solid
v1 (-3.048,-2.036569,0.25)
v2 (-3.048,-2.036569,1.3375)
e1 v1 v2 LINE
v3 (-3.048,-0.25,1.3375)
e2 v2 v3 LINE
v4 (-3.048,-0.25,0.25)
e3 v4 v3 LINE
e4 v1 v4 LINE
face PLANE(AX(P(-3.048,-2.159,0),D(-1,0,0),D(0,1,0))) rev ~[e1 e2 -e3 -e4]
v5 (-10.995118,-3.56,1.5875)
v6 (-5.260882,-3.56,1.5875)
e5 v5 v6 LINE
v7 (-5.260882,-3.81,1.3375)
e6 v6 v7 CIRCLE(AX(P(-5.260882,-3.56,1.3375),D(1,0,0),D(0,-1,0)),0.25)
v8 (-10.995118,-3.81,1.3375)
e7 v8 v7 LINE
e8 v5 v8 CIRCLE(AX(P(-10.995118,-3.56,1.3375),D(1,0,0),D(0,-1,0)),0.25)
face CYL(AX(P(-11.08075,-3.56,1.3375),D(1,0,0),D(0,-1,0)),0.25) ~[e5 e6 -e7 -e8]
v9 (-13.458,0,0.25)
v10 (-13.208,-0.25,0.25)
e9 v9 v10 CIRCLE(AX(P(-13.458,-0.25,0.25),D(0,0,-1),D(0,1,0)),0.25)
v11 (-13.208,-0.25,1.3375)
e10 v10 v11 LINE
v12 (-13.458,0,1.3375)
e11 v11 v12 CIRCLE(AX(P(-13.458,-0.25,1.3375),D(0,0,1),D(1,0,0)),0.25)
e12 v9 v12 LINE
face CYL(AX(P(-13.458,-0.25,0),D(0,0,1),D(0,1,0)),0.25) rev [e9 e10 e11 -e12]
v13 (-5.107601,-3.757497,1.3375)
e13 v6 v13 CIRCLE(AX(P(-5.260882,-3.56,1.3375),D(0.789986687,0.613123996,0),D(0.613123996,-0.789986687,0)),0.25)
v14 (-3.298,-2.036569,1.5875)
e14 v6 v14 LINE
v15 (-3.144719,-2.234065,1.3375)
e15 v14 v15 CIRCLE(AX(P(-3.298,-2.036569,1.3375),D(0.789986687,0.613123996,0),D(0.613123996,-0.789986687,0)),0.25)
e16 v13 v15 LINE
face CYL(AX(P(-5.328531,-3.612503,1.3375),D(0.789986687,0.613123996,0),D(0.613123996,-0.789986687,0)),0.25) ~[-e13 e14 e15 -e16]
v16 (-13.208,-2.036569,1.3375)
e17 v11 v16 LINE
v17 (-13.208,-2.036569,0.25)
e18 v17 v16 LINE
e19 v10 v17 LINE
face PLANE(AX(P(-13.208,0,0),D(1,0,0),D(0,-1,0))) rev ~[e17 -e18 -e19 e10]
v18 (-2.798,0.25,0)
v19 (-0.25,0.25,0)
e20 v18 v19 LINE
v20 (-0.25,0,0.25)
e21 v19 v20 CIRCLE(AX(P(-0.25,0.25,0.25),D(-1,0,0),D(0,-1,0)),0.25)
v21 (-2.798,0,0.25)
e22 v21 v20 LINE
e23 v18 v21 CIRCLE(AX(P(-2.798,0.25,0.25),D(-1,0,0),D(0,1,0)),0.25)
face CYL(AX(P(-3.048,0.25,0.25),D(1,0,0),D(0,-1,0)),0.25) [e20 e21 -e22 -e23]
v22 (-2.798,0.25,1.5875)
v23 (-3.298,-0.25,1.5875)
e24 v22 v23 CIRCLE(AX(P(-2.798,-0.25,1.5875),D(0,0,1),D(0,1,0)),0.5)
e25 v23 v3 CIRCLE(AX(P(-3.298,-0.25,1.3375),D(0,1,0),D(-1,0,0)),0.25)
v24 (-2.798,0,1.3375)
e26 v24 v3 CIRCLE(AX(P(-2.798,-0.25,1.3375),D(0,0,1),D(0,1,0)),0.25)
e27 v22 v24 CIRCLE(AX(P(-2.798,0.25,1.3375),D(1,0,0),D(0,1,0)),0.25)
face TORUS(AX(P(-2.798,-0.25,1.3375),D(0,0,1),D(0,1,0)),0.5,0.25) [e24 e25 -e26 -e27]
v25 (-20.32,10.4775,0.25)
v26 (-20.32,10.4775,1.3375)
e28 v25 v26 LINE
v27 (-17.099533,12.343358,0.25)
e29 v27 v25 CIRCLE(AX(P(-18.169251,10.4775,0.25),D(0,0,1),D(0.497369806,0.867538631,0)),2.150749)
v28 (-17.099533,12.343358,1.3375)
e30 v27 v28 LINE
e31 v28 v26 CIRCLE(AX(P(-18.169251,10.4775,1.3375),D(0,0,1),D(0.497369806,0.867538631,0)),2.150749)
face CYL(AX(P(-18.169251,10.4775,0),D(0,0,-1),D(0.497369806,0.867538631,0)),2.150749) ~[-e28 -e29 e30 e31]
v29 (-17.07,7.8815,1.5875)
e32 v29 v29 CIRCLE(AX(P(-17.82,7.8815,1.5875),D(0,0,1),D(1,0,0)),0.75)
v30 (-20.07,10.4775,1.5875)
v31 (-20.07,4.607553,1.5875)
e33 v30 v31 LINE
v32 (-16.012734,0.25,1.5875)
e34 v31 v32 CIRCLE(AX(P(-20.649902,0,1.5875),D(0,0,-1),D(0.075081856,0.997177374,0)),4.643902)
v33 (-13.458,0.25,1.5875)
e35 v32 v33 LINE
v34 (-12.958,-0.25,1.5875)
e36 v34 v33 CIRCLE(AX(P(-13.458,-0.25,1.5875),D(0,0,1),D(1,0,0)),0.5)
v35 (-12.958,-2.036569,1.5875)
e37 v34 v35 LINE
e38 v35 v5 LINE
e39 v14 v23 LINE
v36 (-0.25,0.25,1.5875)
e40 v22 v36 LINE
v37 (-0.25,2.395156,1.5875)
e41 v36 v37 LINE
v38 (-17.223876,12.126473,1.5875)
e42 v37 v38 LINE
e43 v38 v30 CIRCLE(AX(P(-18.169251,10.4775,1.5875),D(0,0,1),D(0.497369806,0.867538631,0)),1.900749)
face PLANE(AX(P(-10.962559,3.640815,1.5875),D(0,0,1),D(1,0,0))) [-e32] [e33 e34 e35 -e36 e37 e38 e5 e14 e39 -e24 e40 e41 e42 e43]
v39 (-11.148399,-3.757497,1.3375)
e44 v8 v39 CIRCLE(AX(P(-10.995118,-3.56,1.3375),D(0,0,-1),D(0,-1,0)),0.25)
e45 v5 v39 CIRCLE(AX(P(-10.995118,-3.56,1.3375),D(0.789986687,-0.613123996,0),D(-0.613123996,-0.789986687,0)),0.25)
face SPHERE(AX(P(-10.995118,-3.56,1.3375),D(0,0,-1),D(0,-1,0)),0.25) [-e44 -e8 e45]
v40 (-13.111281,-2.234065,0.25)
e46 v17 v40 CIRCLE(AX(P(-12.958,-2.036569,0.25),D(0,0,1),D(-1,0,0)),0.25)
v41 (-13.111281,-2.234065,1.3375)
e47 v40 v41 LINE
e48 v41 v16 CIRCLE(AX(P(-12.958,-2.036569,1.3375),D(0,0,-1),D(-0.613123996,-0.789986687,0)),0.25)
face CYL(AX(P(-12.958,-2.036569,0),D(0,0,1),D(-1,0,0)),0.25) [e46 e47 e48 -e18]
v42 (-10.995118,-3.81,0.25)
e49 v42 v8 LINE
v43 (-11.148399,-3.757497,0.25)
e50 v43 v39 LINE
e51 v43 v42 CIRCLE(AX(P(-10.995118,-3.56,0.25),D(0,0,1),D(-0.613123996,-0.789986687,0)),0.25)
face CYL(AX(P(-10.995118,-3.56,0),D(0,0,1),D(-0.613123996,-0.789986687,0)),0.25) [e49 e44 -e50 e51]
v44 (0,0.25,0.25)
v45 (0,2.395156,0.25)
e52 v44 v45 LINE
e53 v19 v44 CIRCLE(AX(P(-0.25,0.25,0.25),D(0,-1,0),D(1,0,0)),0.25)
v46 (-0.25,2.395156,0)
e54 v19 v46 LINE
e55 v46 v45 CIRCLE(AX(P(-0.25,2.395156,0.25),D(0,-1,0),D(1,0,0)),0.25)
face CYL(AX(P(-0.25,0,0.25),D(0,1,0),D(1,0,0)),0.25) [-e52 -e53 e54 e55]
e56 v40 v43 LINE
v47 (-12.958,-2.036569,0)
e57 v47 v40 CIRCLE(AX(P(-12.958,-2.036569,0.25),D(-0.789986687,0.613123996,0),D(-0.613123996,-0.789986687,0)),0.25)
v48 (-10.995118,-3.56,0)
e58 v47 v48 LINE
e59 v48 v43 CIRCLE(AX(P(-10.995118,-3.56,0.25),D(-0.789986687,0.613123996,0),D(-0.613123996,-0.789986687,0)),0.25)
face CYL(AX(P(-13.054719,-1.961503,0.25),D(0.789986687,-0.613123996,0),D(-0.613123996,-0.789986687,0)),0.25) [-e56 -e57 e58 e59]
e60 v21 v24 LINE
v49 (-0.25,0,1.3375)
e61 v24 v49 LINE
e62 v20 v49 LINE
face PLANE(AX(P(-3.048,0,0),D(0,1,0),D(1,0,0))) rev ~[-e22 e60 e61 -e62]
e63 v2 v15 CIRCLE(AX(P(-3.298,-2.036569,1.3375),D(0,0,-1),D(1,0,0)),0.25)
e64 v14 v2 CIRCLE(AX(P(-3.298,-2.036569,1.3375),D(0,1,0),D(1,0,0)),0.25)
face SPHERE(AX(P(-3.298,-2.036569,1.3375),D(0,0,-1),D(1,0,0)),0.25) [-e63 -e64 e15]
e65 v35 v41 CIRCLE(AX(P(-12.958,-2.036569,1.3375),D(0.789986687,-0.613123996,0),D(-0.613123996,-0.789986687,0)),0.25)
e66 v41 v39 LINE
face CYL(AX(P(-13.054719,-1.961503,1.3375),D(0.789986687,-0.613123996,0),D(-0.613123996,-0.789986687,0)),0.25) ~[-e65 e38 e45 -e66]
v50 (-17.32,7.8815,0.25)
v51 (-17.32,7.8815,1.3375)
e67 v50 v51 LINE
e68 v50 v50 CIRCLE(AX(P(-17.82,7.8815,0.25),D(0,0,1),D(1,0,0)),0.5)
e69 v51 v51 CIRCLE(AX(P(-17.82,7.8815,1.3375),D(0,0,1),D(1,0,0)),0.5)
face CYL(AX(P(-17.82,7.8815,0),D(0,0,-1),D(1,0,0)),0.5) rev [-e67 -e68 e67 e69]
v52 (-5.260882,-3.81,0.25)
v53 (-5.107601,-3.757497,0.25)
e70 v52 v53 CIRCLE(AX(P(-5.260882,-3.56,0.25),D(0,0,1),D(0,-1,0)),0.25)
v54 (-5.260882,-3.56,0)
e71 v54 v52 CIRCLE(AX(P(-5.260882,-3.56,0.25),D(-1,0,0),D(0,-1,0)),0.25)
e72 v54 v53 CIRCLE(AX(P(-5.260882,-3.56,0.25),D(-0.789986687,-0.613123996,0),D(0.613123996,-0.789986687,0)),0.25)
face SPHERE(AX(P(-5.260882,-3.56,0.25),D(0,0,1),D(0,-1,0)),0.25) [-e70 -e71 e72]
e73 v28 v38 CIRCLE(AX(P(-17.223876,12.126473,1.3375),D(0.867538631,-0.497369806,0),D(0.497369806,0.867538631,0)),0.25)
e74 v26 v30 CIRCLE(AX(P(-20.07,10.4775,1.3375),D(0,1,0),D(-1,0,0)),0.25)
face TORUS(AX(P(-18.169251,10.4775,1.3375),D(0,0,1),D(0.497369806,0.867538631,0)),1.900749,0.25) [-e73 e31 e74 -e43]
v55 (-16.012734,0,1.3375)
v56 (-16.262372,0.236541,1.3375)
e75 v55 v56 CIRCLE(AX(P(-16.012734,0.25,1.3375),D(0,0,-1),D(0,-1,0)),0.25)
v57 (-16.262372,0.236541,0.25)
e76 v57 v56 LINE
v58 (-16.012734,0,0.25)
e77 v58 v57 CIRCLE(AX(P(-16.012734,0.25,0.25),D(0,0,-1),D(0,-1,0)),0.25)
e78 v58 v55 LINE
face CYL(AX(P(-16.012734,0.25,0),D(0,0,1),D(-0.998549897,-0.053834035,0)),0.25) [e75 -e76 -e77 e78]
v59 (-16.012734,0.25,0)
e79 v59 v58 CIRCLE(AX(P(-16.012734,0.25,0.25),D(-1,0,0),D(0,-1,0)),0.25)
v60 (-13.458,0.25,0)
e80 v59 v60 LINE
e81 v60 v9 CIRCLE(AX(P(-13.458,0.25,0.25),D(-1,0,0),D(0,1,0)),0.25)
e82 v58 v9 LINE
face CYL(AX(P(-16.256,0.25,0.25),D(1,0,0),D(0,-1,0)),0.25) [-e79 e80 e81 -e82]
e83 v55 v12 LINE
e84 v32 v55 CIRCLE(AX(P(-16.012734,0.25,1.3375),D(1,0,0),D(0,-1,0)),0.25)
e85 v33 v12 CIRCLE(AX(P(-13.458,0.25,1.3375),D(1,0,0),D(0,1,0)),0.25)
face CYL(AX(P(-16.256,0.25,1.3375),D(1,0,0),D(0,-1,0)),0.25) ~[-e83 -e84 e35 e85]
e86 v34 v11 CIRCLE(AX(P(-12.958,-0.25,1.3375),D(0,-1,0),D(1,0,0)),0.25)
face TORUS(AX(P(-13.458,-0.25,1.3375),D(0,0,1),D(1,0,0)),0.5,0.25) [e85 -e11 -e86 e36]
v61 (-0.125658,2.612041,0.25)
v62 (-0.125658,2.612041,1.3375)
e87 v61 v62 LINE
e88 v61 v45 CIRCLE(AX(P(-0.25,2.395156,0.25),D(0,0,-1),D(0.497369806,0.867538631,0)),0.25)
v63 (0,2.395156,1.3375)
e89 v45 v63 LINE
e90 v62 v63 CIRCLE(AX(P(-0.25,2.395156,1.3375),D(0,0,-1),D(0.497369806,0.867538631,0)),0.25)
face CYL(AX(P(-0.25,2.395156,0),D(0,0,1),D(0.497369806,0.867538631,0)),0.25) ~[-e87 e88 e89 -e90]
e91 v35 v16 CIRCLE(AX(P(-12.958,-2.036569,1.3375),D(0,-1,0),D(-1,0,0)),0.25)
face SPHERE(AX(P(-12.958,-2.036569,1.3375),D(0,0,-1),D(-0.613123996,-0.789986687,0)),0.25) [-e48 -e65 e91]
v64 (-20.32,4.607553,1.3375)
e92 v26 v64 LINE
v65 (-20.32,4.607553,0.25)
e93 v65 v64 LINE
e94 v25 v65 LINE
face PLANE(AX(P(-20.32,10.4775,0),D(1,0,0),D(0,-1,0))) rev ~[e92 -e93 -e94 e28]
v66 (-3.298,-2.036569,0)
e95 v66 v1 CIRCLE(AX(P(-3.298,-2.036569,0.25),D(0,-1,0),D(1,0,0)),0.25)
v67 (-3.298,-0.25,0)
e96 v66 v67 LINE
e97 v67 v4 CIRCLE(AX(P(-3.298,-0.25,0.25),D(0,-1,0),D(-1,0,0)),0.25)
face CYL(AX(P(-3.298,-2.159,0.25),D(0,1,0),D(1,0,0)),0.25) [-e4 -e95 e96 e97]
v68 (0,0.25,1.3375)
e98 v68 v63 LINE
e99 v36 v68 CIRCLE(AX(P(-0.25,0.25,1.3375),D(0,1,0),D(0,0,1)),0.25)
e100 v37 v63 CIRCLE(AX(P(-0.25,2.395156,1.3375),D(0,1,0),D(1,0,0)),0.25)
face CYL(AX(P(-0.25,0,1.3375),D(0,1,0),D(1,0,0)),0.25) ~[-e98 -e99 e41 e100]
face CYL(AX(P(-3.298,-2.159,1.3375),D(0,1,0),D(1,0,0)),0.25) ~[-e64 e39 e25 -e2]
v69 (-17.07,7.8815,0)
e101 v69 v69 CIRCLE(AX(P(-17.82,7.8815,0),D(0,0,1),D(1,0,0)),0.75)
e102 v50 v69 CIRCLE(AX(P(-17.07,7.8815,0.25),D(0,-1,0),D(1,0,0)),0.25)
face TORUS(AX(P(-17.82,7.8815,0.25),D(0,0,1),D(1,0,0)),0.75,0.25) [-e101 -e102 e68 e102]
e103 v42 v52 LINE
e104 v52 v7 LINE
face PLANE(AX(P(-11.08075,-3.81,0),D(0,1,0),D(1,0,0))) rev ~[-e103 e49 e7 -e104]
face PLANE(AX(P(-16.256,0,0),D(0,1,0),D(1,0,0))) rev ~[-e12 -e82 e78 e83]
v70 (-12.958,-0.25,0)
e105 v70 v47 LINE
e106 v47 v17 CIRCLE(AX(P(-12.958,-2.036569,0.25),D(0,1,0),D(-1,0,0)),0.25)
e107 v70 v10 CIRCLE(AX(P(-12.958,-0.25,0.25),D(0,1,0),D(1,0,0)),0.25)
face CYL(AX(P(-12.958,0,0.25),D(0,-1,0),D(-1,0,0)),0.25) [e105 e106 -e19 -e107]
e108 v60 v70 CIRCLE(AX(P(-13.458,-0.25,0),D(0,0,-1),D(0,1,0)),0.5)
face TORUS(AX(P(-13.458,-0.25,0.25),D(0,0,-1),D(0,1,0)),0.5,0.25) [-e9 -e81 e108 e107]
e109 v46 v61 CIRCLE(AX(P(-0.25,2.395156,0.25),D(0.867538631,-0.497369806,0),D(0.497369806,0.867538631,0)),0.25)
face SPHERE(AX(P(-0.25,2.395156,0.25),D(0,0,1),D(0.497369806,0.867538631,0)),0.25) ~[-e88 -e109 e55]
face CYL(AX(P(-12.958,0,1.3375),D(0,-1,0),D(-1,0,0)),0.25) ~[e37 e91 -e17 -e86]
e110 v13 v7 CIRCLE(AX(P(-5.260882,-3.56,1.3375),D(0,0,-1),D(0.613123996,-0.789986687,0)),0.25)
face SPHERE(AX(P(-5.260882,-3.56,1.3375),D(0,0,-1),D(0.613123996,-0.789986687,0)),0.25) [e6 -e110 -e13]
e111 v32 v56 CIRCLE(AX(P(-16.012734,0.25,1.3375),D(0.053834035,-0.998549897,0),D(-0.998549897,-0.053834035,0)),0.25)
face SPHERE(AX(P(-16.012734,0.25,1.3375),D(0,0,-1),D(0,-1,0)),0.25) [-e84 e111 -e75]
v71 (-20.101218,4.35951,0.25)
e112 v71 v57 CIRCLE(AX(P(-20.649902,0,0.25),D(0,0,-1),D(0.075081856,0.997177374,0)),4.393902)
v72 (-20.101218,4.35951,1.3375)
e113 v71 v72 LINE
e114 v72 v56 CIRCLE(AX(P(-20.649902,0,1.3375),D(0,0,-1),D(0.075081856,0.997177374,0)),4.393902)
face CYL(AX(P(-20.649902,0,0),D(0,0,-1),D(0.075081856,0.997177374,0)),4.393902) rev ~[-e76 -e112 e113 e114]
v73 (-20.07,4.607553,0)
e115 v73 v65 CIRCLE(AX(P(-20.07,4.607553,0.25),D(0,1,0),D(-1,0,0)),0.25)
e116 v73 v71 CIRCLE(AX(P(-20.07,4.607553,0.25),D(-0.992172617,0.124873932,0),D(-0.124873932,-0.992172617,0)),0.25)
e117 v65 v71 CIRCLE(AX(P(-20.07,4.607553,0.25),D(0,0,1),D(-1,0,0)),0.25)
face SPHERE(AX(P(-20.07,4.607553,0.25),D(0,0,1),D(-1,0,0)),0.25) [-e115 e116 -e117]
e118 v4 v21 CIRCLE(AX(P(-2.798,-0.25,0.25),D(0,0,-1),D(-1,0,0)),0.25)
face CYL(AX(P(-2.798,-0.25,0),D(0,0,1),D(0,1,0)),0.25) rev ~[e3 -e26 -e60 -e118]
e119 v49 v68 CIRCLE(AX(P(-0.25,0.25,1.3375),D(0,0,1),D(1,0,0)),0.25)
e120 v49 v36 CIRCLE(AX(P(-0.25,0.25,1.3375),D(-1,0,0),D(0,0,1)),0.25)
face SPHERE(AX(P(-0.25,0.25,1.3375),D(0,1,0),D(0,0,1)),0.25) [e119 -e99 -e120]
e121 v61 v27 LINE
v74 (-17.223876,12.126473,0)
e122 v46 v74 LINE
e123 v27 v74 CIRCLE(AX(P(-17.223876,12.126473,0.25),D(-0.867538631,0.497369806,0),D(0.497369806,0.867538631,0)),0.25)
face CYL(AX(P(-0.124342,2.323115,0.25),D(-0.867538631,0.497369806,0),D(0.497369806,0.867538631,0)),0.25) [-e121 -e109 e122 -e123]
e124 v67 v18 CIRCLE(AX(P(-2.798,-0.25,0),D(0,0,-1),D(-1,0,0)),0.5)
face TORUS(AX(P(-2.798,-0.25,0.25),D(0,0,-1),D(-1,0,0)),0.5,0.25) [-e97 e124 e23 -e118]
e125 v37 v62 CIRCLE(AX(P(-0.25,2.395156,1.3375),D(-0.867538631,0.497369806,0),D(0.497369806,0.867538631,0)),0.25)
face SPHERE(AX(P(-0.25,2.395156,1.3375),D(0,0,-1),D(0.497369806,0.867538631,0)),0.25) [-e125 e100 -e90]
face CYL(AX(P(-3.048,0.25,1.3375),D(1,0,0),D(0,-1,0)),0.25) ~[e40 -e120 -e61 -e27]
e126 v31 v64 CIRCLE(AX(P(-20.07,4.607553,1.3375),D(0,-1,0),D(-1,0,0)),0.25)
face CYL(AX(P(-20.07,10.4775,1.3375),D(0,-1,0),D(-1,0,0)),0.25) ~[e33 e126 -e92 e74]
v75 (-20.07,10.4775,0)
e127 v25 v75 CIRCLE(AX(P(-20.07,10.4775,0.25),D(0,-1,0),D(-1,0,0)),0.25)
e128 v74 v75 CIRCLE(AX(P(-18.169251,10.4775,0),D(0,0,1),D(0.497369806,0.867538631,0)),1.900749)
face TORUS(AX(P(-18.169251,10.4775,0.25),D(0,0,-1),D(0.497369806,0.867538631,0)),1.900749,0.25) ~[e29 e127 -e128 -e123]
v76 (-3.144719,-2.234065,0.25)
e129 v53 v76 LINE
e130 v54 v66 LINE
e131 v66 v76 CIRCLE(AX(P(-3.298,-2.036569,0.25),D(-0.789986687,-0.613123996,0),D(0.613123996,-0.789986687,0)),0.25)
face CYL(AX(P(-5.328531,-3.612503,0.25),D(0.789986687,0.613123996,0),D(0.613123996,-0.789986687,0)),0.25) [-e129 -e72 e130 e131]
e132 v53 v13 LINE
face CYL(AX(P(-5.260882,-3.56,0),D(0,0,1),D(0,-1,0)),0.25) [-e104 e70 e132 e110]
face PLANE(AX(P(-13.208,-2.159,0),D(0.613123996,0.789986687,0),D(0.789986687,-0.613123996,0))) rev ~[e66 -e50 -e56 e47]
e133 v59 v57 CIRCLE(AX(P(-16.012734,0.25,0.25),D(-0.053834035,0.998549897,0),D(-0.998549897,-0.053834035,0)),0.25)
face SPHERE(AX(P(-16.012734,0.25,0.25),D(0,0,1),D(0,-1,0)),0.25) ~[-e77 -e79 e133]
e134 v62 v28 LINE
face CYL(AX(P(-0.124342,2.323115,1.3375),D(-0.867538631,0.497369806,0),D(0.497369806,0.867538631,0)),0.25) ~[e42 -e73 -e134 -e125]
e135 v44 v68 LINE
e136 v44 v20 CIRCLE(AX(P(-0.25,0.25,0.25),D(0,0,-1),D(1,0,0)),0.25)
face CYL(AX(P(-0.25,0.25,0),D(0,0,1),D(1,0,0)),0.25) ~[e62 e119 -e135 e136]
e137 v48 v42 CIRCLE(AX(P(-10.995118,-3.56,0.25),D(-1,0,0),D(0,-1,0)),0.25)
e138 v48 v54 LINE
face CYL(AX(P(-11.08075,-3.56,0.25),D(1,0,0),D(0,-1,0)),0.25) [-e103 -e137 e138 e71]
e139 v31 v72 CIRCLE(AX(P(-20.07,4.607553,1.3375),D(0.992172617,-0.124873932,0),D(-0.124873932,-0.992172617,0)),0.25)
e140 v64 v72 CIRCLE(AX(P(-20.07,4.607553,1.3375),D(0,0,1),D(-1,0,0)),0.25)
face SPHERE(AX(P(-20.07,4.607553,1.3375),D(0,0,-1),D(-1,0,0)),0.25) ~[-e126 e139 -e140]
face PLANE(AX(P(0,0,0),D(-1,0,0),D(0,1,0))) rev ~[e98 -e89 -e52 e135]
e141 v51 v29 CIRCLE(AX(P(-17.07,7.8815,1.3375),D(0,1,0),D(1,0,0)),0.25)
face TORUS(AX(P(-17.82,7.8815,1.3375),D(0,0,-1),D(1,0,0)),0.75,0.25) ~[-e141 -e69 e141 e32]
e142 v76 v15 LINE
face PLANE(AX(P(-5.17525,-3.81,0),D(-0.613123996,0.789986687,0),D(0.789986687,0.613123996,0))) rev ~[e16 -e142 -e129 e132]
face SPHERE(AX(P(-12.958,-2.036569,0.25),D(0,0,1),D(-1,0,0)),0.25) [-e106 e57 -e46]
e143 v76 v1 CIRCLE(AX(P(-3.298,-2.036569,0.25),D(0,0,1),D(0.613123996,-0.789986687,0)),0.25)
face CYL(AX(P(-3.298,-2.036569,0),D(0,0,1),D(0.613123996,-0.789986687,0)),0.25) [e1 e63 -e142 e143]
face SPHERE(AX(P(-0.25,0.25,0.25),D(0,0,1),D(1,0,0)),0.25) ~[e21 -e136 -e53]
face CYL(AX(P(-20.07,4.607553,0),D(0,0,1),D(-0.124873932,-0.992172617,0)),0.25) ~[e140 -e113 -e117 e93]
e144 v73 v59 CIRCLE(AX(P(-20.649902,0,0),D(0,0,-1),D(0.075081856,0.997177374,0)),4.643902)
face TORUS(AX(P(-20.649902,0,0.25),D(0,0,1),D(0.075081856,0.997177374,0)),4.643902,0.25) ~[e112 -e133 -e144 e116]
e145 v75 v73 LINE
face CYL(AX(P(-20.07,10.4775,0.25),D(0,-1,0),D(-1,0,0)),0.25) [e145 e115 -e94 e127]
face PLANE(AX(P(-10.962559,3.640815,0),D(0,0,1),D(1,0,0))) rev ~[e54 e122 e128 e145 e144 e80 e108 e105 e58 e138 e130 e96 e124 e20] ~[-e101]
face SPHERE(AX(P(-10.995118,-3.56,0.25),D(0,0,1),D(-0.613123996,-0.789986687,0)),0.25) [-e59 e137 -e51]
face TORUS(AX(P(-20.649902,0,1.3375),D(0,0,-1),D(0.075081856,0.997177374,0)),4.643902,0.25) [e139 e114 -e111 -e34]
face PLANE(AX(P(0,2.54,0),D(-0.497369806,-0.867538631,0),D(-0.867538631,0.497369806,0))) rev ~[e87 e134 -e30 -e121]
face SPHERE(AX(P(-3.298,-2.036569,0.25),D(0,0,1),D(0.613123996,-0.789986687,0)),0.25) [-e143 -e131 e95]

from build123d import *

# Parameters (mm, degrees)
F0_R     = 0.5
F1_DEPTH = 1.5875
F2_R     = 0.25


with BuildPart() as f1:
    # F0 (on Top) → F1 (new body)
    with BuildSketch(Plane.XY):
        with BuildLine():
            ThreePointArc((-20.32, 4.3815), (-17.4284169342, 2.9880444378), (-16.256, 0))
            Line((-16.256, 0), (-13.208, 0))
            Line((-13.208, 0), (-13.208, -2.159))
            Line((-13.208, -2.159), (-11.08075, -3.81))
            Line((-11.08075, -3.81), (-5.17525, -3.81))
            Line((-5.17525, -3.81), (-3.048, -2.159))
            Line((-3.048, -2.159), (-3.048, 0))
            Line((-3.048, 0), (0, 0))
            Line((0, 0), (0, 2.54))
            Line((0, 2.54), (-17.0995334348, 12.3433578162))
            ThreePointArc((-17.0995334348, 12.3433578162), (-19.2474502496, 12.3384695247), (-20.32, 10.4775))
            Line((-20.32, 10.4775), (-20.32, 4.3815))
        make_face()
        with Locations((-17.82, 7.8815)):
            Circle(F0_R, mode=Mode.SUBTRACT)
    extrude(amount=F1_DEPTH)

    # F2
    f2_edges = [f1.edges().sort_by_distance(p)[0] for p in [
        (-20.32, 7.4295, 1.5875),
        (-19.24745, 12.33847, 1.5875),
        (-8.549767, 7.441679, 1.5875),
        (0, 1.27, 1.5875),
        (-1.524, 0, 1.5875),
        (-3.048, -1.0795, 1.5875),
        (-4.111625, -2.9845, 1.5875),
        (-8.128, -3.81, 1.5875),
        (-12.144375, -2.9845, 1.5875),
        (-13.208, -1.0795, 1.5875),
        (-14.732, 0, 1.5875),
        (-17.428417, 2.988044, 1.5875),
        (-17.428417, 2.988044, 0),
        (-20.32, 4.3815, 0.79375),
        (0, 0, 0.79375),
        (0, 2.54, 0.79375),
        (-3.048, 0, 0.79375),
        (-3.048, -2.159, 0.79375),
        (-5.17525, -3.81, 0.79375),
        (-11.08075, -3.81, 0.79375),
        (-13.208, -2.159, 0.79375),
        (-20.32, 7.4295, 0),
        (-19.24745, 12.33847, 0),
        (-8.549767, 7.441679, 0),
        (0, 1.27, 0),
        (-13.208, -1.0795, 0),
        (-12.144375, -2.9845, 0),
        (-8.128, -3.81, 0),
        (-4.111625, -2.9845, 0),
        (-3.048, -1.0795, 0),
        (-1.524, 0, 0),
        (-16.256, 0, 0.79375),
        (-13.208, 0, 0.79375),
        (-18.32, 7.8815, 1.5875),
        (-18.32, 7.8815, 0),
        (-14.732, 0, 0),
    ]]
    fillet(f2_edges, radius=F2_R)


solid = f1.part
